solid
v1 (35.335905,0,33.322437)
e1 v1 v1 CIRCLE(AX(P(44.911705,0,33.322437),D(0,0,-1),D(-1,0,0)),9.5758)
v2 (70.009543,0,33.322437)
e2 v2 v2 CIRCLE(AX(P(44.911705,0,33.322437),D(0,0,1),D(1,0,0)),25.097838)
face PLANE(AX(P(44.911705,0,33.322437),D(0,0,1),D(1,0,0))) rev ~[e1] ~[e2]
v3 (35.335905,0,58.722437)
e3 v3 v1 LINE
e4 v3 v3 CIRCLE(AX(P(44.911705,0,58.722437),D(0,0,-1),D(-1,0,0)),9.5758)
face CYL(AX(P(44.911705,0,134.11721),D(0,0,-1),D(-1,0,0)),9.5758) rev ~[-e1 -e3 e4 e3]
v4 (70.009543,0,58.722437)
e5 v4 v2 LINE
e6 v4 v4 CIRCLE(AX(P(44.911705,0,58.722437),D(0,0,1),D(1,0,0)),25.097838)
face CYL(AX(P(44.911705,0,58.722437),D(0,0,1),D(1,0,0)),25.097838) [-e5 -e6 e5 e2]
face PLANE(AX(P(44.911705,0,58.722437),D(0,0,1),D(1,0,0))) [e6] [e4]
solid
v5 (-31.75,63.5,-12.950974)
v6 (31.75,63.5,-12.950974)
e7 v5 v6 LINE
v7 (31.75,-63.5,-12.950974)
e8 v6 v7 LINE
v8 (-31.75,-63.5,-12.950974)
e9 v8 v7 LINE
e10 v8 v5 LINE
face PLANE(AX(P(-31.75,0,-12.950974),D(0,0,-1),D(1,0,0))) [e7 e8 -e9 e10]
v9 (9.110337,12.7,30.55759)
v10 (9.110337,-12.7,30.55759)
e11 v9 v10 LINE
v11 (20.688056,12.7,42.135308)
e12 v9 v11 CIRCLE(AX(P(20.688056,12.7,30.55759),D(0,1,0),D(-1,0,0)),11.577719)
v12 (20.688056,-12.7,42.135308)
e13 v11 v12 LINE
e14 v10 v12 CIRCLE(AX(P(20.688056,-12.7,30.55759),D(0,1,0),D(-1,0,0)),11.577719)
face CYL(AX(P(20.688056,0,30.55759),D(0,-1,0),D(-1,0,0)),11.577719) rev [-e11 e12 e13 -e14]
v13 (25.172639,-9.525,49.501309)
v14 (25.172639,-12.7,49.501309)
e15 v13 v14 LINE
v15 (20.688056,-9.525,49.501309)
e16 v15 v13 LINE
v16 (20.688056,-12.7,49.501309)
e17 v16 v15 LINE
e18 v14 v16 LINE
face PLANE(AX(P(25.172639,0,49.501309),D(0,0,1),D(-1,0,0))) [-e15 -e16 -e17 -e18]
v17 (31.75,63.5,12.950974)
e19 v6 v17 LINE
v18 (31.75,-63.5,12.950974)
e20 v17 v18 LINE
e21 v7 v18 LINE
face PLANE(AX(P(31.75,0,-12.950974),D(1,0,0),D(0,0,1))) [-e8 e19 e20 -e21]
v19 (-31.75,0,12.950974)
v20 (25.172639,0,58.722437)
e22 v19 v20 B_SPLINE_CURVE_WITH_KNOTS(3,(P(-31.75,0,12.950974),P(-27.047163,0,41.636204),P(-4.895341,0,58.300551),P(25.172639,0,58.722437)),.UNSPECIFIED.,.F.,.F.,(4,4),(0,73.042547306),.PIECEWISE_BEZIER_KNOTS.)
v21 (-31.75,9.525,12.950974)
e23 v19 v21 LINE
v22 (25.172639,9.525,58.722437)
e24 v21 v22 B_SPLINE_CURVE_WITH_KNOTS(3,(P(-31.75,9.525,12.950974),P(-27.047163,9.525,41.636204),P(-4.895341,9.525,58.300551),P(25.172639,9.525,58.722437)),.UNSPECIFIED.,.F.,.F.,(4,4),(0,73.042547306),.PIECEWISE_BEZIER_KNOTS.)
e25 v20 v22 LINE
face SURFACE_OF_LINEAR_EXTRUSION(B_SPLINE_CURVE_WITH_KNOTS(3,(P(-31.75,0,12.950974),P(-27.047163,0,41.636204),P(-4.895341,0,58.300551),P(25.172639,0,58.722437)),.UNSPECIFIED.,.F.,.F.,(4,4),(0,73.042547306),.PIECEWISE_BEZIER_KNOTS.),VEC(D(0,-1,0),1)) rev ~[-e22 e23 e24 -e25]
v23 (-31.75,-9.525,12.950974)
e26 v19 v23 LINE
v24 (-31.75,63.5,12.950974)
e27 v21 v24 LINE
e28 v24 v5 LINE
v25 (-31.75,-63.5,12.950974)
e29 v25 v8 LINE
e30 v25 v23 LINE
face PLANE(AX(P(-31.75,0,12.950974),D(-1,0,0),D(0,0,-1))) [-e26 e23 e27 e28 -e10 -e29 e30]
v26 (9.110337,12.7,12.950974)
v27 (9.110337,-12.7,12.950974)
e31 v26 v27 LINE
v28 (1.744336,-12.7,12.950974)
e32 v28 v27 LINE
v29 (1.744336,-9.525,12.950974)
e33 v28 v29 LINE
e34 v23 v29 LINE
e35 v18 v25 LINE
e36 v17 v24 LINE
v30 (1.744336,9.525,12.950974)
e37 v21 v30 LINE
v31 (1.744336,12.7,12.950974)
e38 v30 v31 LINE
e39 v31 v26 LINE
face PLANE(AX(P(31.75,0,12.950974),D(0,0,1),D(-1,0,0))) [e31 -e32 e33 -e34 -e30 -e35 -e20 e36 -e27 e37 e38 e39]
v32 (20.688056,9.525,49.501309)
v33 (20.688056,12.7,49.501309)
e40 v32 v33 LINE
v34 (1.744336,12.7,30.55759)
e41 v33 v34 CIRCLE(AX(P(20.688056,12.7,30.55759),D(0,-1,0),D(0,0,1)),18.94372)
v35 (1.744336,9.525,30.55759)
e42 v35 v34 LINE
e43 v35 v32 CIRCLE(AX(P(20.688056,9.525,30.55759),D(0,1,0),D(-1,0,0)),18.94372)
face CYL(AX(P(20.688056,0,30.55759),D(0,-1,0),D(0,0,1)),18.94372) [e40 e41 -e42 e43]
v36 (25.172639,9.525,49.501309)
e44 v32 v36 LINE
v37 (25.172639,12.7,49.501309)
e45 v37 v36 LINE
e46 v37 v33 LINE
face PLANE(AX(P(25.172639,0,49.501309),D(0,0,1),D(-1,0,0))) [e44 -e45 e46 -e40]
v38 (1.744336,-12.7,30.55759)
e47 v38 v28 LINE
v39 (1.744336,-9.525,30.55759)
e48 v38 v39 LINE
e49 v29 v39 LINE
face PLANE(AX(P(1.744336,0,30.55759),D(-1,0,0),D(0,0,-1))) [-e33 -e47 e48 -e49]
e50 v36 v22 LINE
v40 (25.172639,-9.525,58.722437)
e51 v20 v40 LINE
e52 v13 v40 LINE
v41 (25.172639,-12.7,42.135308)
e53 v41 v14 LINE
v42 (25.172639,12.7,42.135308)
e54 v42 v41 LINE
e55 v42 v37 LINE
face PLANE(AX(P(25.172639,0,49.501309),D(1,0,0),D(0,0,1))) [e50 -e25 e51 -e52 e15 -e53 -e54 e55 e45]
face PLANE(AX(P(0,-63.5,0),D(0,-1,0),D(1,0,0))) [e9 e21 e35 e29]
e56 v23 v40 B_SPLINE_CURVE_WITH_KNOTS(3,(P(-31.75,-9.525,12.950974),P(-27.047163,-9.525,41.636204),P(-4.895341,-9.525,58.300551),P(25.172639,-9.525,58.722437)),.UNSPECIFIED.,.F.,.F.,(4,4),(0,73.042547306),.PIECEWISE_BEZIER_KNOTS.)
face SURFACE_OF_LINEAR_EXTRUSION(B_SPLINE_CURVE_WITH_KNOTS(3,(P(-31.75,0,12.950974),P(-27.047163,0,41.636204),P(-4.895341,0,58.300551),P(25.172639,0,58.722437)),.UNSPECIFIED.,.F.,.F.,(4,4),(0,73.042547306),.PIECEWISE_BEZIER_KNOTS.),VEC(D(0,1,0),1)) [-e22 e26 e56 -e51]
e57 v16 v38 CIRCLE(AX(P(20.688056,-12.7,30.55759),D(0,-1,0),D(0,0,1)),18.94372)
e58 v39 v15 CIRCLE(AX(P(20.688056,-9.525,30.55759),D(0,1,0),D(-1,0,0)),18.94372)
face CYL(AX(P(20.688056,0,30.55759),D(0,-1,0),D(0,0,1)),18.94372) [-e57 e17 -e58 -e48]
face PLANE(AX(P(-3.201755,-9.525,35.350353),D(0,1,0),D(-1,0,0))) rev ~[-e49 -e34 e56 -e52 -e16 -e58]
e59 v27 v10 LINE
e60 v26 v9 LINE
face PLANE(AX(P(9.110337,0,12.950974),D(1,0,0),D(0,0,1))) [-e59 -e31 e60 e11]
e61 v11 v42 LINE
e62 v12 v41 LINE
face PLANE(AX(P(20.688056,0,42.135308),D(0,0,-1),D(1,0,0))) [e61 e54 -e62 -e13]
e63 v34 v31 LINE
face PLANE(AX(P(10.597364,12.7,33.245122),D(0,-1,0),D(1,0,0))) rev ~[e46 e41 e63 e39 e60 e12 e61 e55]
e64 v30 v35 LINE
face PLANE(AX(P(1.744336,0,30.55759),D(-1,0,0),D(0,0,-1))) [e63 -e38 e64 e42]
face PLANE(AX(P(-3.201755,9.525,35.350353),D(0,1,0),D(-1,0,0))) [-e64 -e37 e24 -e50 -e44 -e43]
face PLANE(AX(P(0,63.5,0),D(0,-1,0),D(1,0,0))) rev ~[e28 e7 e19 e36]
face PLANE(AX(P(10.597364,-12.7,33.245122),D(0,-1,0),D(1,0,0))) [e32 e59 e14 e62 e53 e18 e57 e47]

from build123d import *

# Parameters (mm, degrees)
F1_DEPTH = 63.5
F2_DEPTH = 9.525
F3_DEPTH = 12.7
F5_R     = 25.0978379379
F6_DEPTH = 25.4
F8_D     = 19.1516


with BuildPart() as f1:
    # F0 (on Front) → F1 (new body, symmetric)
    with BuildSketch(Plane.XZ):
        Polygon((-31.75, -12.9509741405), (31.75, -12.9509741405), (31.75, 12.9509741405), (9.1103371233, 12.9509741405), (1.7443363501, 12.9509741405), (-31.75, 12.9509741405), align=None)
    extrude(amount=F1_DEPTH, both=True)

    # F0 (on Front) → F2 (join, symmetric)
    with BuildSketch(Plane.XZ):
        with BuildLine():
            add(Edge.make_bspline(
                [(-31.75, 12.9509741405), (-27.0471625327, 41.6362041566), (-4.8953407756, 58.3005508379), (25.1726394472, 58.7224372514)],
                knots=[0, 0, 0, 0, 73.042547306, 73.042547306, 73.042547306, 73.042547306], degree=3))
            Line((-31.75, 12.9509741405), (1.7443363501, 12.9509741405))
            Line((1.7443363501, 12.9509741405), (1.7443363501, 30.5575896055))
            ThreePointArc((1.7443363501, 30.5575896055), (7.2928233486, 43.9528221678), (20.688055911, 49.5013091663))
            Line((20.688055911, 49.5013091663), (25.1726394472, 49.5013091663))
            Line((25.1726394472, 49.5013091663), (25.1726394472, 58.7224372514))
        make_face()
    extrude(amount=F2_DEPTH, both=True)

    # F0 (on Front) → F3 (join, symmetric)
    with BuildSketch(Plane.XZ):
        with BuildLine():
            Line((1.7443363501, 12.9509741405), (9.1103371233, 12.9509741405))
            Line((9.1103371233, 12.9509741405), (9.1103371233, 30.5575896055))
            ThreePointArc((9.1103371233, 30.5575896055), (12.5013724455, 38.7442730709), (20.688055911, 42.1353083932))
            Line((20.688055911, 42.1353083932), (25.1726394472, 42.1353083932))
            Line((25.1726394472, 42.1353083932), (25.1726394472, 49.5013091663))
            Line((25.1726394472, 49.5013091663), (20.688055911, 49.5013091663))
            ThreePointArc((20.688055911, 49.5013091663), (7.2928233486, 43.9528221678), (1.7443363501, 30.5575896055))
            Line((1.7443363501, 30.5575896055), (1.7443363501, 12.9509741405))
        make_face()
    extrude(amount=F3_DEPTH, both=True)


with BuildPart() as f4:
    # F0 (on Front) → F4 (revolve)
    with BuildSketch(Plane.XZ):
        Polygon((64.6507700858, 58.7224372514), (44.9117047665, 58.7224372514), (44.9117047665, 49.5013091663), (44.9117047665, 42.1353083932), (44.9117047665, 35.1127609611), (64.6507700858, 35.1127609611), align=None)
    revolve(axis=Axis((44.9117047665, 0, 46.9175991062), (0, 0, -1)))

    # F5 (on face) → F6 (join)
    with BuildSketch(Plane.XY.offset(58.7224372514)):
        with Locations((44.9117047665, 0)):
            Circle(F5_R)
    extrude(amount=-F6_DEPTH)

    # F8 (through all)
    with Locations(Plane.XY.offset(58.7224372514)):
        with Locations((44.9117047665, 0)):
            Hole(F8_D / 2)


solid = Compound([f1.part, f4.part])
